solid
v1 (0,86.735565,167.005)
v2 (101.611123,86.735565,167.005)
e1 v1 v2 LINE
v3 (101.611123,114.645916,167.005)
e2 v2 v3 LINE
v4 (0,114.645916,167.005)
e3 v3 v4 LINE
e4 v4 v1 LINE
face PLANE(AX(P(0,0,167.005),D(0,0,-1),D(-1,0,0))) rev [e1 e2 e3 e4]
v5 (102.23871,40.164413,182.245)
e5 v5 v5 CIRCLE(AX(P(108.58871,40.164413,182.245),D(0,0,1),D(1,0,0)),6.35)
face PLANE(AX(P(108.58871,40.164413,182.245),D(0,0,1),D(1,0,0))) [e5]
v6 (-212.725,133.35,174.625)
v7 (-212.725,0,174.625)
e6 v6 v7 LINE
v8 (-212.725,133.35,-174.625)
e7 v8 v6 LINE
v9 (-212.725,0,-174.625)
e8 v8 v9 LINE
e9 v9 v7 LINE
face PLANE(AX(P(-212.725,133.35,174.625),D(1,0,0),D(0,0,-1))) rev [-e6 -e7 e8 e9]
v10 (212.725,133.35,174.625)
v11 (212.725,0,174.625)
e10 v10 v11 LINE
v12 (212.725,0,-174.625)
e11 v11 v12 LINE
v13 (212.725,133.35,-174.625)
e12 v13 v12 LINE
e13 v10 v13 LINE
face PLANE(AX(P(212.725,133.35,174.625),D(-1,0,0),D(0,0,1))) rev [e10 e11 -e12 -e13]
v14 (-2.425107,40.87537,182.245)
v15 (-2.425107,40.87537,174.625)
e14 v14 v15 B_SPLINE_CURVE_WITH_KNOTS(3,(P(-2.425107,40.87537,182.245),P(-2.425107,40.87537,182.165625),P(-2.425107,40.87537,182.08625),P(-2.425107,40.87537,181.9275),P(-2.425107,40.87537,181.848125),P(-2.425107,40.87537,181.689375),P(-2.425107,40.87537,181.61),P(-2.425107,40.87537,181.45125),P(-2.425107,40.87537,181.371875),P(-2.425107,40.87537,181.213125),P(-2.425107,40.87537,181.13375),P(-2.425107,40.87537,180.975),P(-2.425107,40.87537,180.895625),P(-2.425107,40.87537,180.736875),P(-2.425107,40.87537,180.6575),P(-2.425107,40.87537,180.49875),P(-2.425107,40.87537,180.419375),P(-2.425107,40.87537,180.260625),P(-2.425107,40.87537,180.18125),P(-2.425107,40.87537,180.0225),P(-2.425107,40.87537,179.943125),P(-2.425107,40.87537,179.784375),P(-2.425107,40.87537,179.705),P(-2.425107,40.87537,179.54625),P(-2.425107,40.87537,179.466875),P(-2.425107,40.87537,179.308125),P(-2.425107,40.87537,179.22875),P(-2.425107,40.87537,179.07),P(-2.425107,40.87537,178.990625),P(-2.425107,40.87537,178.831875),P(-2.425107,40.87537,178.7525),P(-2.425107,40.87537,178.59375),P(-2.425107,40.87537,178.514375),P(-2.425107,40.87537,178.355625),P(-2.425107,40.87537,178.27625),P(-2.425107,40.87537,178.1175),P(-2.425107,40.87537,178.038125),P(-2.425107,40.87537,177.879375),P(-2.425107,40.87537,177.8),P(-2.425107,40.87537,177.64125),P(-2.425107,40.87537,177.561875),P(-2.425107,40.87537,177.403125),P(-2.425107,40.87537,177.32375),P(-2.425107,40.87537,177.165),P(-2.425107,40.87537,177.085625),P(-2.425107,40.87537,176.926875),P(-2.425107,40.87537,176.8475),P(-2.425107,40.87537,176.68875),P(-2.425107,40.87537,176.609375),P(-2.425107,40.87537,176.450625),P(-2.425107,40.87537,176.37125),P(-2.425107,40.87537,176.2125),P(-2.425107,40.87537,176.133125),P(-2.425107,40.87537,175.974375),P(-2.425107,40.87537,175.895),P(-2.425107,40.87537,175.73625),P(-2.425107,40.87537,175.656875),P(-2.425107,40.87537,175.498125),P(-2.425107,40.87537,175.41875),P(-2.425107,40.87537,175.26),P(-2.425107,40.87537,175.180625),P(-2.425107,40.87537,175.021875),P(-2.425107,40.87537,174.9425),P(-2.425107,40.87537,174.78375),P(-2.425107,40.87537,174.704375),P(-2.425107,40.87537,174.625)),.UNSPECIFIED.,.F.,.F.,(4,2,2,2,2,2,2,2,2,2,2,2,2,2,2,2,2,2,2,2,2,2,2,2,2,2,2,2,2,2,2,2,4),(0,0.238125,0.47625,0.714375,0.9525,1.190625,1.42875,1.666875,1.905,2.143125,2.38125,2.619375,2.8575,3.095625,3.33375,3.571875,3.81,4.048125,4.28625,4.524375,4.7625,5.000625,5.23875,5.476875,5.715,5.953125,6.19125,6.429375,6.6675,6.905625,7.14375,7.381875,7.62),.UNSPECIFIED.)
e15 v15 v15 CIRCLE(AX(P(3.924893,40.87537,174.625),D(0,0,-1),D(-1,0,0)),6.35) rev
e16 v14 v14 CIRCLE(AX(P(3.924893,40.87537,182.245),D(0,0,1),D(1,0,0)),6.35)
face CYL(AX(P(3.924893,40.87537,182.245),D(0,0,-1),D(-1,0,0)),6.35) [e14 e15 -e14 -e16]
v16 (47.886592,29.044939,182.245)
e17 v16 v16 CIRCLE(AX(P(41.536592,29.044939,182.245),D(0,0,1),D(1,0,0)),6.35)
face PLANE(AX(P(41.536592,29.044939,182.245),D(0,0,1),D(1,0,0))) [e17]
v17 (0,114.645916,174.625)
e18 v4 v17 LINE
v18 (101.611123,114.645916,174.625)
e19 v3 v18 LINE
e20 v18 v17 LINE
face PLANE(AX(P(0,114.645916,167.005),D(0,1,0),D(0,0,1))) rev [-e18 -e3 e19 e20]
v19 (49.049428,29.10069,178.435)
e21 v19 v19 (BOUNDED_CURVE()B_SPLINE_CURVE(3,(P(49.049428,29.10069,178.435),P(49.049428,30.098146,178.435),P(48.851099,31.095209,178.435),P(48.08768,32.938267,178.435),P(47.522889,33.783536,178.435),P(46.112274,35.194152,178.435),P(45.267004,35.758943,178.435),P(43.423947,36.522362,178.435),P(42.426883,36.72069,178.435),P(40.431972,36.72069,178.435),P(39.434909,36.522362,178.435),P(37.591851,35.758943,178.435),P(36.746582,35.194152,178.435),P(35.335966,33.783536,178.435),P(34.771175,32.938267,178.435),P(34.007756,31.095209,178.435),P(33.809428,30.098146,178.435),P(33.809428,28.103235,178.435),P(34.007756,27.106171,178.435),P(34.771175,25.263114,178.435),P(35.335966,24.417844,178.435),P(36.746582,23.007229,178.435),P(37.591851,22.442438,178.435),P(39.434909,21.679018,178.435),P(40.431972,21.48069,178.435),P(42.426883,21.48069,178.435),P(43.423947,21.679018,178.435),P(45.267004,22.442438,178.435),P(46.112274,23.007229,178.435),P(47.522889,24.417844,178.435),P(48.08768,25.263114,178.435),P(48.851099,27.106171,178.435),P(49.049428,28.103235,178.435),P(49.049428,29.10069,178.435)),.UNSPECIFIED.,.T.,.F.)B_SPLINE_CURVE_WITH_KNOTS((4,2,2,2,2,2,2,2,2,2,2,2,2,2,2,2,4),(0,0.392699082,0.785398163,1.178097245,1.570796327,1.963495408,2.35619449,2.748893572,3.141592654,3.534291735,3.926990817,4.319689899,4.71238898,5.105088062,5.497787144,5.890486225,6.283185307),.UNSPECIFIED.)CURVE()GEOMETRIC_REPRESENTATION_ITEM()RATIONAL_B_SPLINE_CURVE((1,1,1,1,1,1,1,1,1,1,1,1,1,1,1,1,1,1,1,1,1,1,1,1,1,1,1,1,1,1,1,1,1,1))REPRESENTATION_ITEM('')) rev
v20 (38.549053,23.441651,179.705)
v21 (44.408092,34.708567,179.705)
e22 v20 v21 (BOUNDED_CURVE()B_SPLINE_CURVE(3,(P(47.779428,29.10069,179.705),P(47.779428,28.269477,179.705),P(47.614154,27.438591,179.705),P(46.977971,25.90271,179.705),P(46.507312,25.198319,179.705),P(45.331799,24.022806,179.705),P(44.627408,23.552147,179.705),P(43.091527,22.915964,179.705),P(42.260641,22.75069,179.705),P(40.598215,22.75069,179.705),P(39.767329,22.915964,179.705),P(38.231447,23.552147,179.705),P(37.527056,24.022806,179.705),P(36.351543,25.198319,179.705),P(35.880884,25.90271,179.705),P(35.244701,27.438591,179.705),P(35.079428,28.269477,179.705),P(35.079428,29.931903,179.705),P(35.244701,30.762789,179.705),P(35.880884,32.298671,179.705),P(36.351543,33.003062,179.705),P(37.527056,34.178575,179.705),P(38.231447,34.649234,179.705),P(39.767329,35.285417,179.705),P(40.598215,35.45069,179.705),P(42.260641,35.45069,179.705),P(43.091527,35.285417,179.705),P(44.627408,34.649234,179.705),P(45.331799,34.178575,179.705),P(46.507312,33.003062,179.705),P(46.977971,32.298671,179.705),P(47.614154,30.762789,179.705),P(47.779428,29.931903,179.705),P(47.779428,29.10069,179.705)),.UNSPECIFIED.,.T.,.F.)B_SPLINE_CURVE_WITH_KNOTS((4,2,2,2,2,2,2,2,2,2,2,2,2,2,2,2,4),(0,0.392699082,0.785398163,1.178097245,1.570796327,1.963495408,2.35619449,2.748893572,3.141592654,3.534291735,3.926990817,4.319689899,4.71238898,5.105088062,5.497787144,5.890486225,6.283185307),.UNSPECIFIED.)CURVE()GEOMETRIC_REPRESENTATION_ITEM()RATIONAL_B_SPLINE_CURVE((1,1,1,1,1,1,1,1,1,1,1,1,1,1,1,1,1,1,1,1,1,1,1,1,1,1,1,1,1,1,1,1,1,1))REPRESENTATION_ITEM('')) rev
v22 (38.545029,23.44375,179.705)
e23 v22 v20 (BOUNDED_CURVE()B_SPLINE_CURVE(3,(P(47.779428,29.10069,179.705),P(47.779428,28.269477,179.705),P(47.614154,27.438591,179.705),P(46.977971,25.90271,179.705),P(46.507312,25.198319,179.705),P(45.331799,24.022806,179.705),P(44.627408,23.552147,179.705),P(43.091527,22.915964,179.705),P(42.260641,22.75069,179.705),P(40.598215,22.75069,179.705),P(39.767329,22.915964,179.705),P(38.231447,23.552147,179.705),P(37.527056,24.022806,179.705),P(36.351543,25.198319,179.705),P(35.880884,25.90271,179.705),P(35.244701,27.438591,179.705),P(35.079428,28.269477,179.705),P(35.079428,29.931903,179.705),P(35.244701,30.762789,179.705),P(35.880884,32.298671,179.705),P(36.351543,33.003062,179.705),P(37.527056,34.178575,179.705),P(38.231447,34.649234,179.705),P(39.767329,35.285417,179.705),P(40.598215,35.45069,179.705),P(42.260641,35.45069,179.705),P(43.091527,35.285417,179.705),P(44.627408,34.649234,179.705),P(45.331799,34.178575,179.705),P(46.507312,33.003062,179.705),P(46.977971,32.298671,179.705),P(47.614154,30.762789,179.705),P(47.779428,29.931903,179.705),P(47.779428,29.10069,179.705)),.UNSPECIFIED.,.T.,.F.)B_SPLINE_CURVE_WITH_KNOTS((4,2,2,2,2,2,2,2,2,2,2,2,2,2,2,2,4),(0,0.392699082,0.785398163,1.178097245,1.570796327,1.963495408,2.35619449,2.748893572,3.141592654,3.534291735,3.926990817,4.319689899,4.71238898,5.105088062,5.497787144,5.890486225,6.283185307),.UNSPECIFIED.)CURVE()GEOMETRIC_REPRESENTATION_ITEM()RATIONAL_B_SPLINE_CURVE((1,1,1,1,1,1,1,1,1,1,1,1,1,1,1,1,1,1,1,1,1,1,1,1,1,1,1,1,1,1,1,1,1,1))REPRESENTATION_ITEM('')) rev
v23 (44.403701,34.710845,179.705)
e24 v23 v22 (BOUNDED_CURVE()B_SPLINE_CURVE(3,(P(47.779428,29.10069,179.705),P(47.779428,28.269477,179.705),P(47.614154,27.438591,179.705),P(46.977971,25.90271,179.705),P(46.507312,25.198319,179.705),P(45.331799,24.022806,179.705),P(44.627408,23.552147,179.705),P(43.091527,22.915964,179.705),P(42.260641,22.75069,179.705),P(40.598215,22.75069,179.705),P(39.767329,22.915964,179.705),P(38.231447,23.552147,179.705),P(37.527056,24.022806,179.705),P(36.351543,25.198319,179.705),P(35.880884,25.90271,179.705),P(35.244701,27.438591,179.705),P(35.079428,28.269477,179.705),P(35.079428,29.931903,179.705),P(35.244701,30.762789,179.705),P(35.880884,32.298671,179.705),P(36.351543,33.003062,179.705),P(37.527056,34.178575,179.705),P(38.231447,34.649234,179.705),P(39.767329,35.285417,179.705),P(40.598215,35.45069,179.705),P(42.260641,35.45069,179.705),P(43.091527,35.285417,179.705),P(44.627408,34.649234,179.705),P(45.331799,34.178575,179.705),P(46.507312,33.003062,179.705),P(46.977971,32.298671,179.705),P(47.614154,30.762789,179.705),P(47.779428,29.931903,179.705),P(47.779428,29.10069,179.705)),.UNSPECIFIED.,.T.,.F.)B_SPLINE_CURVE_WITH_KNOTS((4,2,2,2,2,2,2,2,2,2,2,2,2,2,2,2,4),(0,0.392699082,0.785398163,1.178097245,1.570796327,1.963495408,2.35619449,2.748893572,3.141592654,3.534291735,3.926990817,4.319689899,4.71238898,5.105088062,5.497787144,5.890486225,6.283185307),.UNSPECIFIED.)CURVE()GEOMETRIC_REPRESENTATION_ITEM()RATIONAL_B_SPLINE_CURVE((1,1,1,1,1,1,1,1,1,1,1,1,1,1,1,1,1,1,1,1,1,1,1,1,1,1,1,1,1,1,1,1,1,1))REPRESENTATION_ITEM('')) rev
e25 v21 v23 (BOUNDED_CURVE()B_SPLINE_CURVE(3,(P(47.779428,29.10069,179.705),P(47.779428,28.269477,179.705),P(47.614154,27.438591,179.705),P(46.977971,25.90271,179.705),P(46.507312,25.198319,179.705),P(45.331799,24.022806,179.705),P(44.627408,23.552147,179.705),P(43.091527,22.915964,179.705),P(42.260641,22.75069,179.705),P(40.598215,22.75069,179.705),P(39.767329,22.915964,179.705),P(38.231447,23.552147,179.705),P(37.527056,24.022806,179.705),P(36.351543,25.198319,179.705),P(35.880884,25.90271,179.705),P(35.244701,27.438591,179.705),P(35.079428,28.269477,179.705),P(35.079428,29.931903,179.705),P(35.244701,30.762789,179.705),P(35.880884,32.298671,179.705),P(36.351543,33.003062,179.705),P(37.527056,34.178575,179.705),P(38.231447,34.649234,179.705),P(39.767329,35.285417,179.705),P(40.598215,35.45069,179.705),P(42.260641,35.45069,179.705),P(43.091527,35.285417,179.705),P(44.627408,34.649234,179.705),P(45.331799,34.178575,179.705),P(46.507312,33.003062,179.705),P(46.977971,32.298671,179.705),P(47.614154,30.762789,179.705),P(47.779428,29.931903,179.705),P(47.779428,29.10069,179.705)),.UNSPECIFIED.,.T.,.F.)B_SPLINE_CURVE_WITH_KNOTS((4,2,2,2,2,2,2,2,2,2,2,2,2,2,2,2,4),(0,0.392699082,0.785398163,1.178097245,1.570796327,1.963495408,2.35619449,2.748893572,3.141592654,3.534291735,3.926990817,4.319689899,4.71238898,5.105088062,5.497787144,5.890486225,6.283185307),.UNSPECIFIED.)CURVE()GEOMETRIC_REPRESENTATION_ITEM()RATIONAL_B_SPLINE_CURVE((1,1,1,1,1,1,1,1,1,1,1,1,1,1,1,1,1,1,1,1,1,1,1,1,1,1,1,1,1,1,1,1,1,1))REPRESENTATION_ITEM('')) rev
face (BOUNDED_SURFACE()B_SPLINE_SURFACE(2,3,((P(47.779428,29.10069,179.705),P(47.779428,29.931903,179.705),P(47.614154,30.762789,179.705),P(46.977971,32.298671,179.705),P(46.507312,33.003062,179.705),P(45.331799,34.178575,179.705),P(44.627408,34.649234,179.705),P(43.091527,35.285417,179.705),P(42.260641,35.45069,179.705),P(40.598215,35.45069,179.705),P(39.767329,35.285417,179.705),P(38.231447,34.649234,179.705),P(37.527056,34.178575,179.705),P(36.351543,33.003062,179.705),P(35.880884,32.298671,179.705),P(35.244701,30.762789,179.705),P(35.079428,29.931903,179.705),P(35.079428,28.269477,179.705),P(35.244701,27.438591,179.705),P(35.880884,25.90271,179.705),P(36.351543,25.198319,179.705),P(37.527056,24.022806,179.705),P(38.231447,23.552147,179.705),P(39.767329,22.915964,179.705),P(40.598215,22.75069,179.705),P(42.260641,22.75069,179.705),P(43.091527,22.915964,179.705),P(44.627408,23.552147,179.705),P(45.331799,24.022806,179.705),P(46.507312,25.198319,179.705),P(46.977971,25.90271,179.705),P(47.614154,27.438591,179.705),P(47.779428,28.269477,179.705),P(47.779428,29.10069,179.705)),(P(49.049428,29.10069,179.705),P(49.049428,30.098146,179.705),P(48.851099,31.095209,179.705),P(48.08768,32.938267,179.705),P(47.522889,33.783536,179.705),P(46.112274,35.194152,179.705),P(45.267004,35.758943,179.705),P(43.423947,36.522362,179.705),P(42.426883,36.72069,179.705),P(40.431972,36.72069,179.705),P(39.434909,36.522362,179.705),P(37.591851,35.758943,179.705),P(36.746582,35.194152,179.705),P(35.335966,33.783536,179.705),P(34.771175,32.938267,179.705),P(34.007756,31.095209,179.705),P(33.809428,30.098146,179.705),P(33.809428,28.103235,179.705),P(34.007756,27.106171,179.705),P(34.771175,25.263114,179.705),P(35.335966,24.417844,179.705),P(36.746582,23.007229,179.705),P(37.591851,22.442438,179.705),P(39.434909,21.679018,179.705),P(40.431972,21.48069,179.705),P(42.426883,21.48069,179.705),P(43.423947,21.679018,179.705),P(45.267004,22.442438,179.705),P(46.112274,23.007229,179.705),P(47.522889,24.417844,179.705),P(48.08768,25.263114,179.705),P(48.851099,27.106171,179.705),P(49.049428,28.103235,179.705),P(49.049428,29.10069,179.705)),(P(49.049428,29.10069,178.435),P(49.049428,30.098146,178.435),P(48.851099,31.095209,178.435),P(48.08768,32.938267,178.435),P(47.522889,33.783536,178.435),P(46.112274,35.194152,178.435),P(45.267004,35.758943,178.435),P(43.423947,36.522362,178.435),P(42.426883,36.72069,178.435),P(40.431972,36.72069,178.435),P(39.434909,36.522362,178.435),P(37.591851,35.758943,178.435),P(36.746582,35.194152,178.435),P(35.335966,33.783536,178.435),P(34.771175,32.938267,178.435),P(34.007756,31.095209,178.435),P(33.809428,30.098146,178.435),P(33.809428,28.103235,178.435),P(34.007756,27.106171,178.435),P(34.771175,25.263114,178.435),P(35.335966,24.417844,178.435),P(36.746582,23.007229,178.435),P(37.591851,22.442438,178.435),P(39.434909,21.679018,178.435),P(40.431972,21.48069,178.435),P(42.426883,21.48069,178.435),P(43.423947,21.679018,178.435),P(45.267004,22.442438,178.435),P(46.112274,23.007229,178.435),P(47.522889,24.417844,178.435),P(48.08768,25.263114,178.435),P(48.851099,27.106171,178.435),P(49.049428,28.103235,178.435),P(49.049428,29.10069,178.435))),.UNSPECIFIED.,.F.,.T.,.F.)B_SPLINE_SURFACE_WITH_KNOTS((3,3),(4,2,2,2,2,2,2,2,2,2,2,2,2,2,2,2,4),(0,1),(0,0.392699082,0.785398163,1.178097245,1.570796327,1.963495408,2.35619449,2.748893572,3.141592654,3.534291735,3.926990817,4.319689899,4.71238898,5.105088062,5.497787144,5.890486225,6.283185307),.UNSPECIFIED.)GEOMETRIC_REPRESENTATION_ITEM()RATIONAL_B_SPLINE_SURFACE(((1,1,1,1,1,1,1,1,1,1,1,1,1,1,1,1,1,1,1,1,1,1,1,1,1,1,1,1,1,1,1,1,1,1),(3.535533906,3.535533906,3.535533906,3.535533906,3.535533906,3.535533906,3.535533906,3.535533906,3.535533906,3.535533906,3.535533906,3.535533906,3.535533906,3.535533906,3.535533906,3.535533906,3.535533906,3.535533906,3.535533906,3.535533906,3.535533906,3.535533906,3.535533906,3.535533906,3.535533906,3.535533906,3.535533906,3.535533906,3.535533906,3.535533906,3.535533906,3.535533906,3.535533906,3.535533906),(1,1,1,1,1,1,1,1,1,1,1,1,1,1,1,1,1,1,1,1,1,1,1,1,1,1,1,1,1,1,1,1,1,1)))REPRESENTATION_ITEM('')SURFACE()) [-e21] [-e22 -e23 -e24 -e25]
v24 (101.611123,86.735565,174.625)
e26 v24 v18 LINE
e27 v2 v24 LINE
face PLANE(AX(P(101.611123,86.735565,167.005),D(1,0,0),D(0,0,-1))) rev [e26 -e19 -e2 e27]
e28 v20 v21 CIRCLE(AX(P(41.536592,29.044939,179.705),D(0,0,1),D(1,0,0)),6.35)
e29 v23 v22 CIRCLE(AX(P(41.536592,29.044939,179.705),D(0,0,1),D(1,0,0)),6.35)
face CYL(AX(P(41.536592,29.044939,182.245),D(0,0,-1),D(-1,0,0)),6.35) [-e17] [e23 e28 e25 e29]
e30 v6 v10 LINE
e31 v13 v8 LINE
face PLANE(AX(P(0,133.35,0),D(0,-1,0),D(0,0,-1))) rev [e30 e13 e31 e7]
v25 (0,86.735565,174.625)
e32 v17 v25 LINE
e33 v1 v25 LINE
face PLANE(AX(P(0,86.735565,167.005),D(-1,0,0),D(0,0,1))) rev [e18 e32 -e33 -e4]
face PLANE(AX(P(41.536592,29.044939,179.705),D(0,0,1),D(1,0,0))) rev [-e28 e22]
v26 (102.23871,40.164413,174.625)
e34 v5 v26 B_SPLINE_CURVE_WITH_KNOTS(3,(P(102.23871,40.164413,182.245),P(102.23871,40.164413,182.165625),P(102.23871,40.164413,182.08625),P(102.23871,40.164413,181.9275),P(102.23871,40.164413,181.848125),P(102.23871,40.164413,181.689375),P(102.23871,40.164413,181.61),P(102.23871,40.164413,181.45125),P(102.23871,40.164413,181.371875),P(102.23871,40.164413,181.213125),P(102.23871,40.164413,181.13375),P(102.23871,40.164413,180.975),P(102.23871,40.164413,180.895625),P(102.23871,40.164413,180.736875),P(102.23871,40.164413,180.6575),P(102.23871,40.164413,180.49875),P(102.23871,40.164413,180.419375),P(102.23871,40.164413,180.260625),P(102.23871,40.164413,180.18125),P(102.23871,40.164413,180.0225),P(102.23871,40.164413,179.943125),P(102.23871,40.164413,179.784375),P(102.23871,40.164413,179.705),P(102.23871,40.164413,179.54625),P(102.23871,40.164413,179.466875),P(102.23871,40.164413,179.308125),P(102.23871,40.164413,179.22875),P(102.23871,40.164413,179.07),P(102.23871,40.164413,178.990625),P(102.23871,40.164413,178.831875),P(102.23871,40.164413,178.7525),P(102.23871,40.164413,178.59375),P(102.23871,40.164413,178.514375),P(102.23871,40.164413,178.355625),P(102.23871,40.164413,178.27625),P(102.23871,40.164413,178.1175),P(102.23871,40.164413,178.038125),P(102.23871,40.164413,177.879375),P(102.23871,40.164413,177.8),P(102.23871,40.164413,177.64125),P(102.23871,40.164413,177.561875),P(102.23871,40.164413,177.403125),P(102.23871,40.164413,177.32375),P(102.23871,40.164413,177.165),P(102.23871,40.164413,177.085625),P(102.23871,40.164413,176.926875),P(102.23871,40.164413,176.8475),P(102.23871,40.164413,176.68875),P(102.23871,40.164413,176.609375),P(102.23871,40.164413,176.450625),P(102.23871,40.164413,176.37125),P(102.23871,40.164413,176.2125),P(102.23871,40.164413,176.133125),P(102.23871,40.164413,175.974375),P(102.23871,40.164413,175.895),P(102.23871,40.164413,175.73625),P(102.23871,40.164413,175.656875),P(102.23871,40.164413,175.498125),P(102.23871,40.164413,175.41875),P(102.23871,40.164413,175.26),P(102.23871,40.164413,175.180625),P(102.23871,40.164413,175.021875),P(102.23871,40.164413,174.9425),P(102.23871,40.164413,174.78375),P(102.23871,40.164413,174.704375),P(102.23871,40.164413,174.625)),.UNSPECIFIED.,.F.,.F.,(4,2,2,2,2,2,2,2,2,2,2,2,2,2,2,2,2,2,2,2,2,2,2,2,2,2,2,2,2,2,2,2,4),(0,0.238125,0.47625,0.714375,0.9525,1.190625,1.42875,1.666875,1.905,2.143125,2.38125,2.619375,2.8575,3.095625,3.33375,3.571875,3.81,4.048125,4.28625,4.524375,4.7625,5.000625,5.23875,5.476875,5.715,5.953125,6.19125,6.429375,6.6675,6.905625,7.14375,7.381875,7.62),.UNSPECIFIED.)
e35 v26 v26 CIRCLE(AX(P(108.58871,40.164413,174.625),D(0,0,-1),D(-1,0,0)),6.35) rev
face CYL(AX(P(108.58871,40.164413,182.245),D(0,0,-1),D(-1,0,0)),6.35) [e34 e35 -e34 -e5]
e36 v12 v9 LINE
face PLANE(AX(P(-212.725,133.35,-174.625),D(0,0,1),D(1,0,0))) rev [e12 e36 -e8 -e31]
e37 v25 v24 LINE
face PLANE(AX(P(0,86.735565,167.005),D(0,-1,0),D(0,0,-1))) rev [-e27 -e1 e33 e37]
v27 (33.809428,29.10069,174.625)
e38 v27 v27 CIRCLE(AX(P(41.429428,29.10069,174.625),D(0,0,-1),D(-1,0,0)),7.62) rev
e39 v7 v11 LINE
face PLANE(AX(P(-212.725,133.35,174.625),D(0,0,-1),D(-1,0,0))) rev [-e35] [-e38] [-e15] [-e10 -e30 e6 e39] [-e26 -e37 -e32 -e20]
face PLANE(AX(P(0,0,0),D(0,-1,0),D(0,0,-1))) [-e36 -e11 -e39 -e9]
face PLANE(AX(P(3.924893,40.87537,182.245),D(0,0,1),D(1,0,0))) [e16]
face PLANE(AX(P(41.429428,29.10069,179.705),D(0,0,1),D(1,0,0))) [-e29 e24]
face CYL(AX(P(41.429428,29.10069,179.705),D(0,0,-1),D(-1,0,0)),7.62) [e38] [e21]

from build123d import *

# Parameters (mm, degrees)
SKETCH1_W           = 425.45
SKETCH1_H           = 349.25
BOSS_EXTRUDE1_DEPTH = 133.35
SKETCH3_W           = 101.611122636
SKETCH3_H           = 27.910351282
CUT_EXTRUDE1_DEPTH  = 7.62
SKETCH4_R           = 6.35
BOSS_EXTRUDE2_DEPTH = 7.62
SKETCH5_R           = 7.62
BOSS_EXTRUDE3_DEPTH = 5.08
FILLET1_SIZE        = 1.27
SKETCH7_R           = 6.35
BOSS_EXTRUDE4_DEPTH = 2.54
SKETCH8_R           = 6.35
BOSS_EXTRUDE5_DEPTH = 7.62


with BuildPart() as part:
    # Sketch1 → Boss-Extrude1 (new body)
    with BuildSketch(Plane(origin=(0, 0, 0), x_dir=(1, 0, 0), z_dir=(0, 1, 0))):
        Rectangle(SKETCH1_W, SKETCH1_H)
    extrude(amount=BOSS_EXTRUDE1_DEPTH)

    # Sketch3 → Cut-Extrude1 (cut)
    with BuildSketch(Plane.XY.offset(174.625)):
        with Locations((50.805561318, 100.690740625)):
            Rectangle(SKETCH3_W, SKETCH3_H)
    extrude(amount=-CUT_EXTRUDE1_DEPTH, mode=Mode.SUBTRACT)

    # Sketch4 → Boss-Extrude2 (add)
    with BuildSketch(Plane.XY.offset(174.625)):
        with Locations(Location((3.924893149, 40.875369667, 0), (0, 0, 180))):
            Circle(SKETCH4_R)
    extrude(amount=BOSS_EXTRUDE2_DEPTH)

    # Sketch5 → Boss-Extrude3 (add)
    with BuildSketch(Plane.XY.offset(174.625)):
        with Locations(Location((41.429427684, 29.10069022, 0), (0, 0, 180))):
            Circle(SKETCH5_R)
    extrude(amount=BOSS_EXTRUDE3_DEPTH)

    # Fillet1
    # a fillet whose section is not a circle: 1.27 mm, written as the material it takes off along each edge
    with BuildSketch(Plane(origin=(41.429427684, 29.10069022, 179.705), x_dir=(-1, 0, 0), z_dir=(0, 1, 0))) as fillet1_piece_1:
        with BuildLine():
            Bezier((7.62, -FILLET1_SIZE), (7.62, 0), (7.62 - FILLET1_SIZE, 0), weights=[1, 3.535533906, 1])
            Line((7.62 - FILLET1_SIZE, 0), (7.62, 0))
            Line((7.62, 0), (7.62, -FILLET1_SIZE))
        make_face()
    revolve(axis=Axis((41.429427684, 29.10069022, 179.705), (0, 0, 1)), mode=Mode.SUBTRACT)

    # Sketch7 → Boss-Extrude4 (add)
    with BuildSketch(Plane.XY.offset(179.705)):
        with Locations(Location((41.536592477, 29.04493903, 0), (0, 0, 241.893573302))):
            Circle(SKETCH7_R)
    extrude(amount=BOSS_EXTRUDE4_DEPTH)

    # Sketch8 → Boss-Extrude5 (add)
    with BuildSketch(Plane.XY.offset(174.625)):
        with Locations(Location((108.588710457, 40.1644131, 0), (0, 0, 180))):
            Circle(SKETCH8_R)
    extrude(amount=BOSS_EXTRUDE5_DEPTH)


solid = part.part
